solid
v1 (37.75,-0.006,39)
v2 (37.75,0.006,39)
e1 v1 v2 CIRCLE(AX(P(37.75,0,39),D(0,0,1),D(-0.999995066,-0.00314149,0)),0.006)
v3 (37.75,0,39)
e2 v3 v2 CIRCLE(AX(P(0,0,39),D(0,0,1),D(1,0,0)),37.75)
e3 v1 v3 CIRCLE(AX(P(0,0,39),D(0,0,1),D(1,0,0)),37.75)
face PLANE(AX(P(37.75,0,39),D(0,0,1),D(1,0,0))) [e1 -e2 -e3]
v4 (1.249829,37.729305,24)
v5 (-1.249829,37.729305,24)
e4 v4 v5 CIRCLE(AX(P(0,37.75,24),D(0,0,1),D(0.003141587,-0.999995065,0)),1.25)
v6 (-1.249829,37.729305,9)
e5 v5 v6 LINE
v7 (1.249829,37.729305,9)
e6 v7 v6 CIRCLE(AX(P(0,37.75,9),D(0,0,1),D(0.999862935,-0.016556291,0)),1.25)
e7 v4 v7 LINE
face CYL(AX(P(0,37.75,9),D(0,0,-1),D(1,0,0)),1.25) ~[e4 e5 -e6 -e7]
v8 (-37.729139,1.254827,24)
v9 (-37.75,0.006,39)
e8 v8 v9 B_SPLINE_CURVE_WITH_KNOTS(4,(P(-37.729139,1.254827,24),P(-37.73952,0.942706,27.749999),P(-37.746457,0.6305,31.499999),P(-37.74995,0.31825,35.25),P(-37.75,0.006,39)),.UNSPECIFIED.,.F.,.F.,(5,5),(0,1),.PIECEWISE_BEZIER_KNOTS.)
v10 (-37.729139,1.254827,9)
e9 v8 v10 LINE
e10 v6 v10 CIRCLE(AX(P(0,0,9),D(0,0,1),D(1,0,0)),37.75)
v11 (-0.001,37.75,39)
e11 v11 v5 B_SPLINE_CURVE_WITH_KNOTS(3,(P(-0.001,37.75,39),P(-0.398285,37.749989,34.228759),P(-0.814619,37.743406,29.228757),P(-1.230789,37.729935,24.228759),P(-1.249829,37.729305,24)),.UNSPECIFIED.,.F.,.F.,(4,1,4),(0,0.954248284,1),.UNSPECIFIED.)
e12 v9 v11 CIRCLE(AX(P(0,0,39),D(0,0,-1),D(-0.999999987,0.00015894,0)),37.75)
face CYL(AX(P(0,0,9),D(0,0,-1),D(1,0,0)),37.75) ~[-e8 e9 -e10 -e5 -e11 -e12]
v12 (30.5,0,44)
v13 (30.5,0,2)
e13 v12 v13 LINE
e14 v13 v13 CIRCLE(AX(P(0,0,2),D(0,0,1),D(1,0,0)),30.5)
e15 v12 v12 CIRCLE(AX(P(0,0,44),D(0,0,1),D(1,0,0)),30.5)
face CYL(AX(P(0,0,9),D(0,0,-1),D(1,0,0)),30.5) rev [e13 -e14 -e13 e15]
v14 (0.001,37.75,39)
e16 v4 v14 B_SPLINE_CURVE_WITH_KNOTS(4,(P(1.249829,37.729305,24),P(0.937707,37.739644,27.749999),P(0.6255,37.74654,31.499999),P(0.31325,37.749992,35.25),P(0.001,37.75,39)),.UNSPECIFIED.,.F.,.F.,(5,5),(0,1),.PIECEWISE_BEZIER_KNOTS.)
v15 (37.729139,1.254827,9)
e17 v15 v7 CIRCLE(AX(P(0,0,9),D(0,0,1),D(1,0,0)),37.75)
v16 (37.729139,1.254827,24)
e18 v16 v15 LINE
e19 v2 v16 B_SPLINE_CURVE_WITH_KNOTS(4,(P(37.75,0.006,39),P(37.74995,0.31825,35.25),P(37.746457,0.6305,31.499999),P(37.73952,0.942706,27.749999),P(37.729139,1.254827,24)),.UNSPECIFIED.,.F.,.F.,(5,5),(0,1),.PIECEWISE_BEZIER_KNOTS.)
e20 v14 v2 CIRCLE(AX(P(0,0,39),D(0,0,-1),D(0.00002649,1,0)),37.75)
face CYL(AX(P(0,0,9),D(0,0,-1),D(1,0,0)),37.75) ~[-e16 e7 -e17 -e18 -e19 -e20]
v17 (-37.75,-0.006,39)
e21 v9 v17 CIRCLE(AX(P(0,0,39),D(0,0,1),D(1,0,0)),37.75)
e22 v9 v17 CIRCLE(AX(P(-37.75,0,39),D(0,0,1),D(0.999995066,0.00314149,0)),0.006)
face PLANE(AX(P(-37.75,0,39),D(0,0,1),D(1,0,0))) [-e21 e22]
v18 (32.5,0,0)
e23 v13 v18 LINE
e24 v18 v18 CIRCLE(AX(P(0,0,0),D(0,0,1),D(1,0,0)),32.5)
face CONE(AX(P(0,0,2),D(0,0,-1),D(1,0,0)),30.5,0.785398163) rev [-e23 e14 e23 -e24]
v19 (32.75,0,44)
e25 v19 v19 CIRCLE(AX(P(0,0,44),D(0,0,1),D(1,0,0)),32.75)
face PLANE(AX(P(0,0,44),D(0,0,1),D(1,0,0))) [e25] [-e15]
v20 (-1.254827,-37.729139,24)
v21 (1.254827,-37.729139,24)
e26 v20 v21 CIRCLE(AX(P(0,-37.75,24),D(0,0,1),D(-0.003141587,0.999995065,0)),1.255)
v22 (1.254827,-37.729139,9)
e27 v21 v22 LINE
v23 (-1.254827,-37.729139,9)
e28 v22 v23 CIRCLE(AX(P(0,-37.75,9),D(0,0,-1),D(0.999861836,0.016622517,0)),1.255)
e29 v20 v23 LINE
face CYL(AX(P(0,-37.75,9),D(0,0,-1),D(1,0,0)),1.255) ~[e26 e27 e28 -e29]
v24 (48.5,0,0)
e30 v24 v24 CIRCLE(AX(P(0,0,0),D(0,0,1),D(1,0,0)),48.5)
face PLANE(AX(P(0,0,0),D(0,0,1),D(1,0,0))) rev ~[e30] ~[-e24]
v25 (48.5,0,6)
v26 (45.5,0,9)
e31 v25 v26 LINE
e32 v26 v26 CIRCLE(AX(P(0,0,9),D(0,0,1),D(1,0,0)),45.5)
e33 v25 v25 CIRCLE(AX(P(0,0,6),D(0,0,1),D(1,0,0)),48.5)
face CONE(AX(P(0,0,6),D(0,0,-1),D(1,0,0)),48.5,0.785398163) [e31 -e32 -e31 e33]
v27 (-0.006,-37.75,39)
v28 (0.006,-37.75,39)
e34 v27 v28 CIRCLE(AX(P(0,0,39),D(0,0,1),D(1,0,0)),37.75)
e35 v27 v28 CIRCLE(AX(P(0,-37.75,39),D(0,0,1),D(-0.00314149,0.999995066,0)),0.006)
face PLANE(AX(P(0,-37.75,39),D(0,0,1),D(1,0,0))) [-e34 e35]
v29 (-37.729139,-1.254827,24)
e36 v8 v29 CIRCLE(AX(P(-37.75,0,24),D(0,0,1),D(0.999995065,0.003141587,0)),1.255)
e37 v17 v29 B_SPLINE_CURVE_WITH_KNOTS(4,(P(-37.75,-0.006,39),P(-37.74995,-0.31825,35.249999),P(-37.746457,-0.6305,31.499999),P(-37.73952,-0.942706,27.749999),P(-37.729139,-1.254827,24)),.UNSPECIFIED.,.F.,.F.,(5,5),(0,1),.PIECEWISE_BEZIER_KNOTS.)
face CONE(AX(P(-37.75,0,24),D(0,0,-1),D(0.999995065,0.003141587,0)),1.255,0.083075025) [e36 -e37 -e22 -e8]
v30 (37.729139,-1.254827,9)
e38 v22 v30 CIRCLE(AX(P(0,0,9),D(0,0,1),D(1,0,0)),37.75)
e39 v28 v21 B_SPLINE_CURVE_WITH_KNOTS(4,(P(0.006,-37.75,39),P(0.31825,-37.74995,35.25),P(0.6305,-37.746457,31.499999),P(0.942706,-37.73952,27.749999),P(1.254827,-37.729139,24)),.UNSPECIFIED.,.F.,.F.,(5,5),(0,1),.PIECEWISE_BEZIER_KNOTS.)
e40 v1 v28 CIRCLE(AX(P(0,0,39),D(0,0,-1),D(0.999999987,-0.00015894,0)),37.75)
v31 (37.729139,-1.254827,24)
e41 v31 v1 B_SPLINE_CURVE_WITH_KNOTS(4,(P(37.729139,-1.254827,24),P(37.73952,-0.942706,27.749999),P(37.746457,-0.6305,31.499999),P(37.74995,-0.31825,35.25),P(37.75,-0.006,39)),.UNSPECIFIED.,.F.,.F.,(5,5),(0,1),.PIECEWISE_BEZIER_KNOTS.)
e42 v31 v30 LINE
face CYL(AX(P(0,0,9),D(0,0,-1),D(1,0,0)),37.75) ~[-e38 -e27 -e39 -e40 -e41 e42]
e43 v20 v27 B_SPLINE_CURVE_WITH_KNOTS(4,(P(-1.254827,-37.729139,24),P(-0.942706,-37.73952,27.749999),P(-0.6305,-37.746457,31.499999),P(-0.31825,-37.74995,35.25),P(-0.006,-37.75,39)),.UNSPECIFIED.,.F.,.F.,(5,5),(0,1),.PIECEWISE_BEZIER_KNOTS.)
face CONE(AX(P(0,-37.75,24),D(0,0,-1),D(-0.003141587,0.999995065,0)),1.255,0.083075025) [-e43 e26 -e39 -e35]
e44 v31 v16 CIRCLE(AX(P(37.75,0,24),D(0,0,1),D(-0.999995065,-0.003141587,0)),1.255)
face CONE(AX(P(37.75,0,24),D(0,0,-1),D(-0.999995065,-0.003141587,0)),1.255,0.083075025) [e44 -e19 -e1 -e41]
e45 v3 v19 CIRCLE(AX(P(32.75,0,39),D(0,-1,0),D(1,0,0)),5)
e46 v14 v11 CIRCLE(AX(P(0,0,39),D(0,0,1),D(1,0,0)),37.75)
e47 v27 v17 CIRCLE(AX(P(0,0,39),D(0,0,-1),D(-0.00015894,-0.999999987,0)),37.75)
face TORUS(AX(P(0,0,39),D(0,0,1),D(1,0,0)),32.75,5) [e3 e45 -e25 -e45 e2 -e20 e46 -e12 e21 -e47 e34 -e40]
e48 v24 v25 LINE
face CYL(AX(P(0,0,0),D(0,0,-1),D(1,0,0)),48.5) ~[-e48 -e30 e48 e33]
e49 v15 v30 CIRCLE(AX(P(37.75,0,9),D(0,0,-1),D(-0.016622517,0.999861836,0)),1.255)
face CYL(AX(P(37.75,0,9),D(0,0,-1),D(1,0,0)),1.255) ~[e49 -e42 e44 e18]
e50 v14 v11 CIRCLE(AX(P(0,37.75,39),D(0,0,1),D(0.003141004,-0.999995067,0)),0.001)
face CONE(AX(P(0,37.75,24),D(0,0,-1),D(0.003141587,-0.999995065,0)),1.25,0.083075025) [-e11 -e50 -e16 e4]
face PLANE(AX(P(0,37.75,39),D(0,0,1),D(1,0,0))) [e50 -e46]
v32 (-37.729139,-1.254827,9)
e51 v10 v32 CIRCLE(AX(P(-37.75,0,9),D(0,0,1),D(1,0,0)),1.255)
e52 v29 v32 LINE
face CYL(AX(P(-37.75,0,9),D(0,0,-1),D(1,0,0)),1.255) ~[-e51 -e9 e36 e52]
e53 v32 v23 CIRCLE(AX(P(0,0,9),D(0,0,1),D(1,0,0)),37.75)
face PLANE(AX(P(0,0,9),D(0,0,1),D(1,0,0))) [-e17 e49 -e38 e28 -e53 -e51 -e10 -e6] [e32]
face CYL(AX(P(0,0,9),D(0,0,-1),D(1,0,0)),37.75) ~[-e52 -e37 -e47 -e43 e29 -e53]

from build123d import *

# Parameters (mm, degrees)
F0_R         = 48.5
F0_R_2       = 30.5
F1_DEPTH     = 9
F2_R         = 37.75
F2_R_2       = 30.5
F3_DEPTH     = 35
F4_R         = 5
F5_R         = 1.25
F5_R_2       = 1.255
F6_DEPTH     = 30
F7_T4_ANGLE  = 359.64
F7_S5_R      = 37.75
F7_T6_DEPTH  = 9
F7_T10_ANGLE = 359.64
F7_S11_R     = 37.75
F7_T12_DEPTH = 9
F7_T16_ANGLE = 359.64
F7_S17_R     = 37.75
F7_T18_DEPTH = 9
F7_T22_ANGLE = 359.64
F7_S23_R     = 37.75
F7_T24_DEPTH = 9
F8_SIZE      = 2
F9_SIZE      = 3


# Not quite as in the source:
# - a fillet or chamfer that OpenCascade refuses, or shapes differently, is made with other operations: its cross-section is extruded or revolved along the edge and cut away or added


with BuildPart() as f1:
    # F0 (on Top) → F1 (new body)
    with BuildSketch(Plane.XY):
        Circle(F0_R)
        Circle(F0_R_2, mode=Mode.SUBTRACT)
    extrude(amount=F1_DEPTH)

    # F2 (on face) → F3 (join)
    with BuildSketch(Plane.XY.offset(9)):
        Circle(F2_R)
        Circle(F2_R_2, mode=Mode.SUBTRACT)
    extrude(amount=F3_DEPTH)

    # F4
    f4_edges = [f1.edges().sort_by_distance(p)[0] for p in [
        (-37.75, 0, 44),
    ]]
    fillet(f4_edges, radius=F4_R)

    # F5 (on face) → F6 (join)
    with BuildSketch(Plane.XY.offset(9)):
        with Locations((0, 37.75)):
            Circle(F5_R)
        with Locations((-37.75, 0)):
            Circle(F5_R_2)
        with Locations((0, -37.75)):
            Circle(F5_R_2)
        with Locations((37.75, 0)):
            Circle(F5_R_2)
    extrude(amount=F6_DEPTH)

    # F7: chamfer of 1.249 x 15 on 4 edges, made by hand


with BuildPart() as f7_tool2:
    # F7_s3 → F7_t4 (revolve)
    with BuildSketch(Plane(origin=(-0.0003725763, 0.1185943423, 0), x_dir=(0, 0, 1), z_dir=(0.0031415875, -0.9999950652, 0))):
        Polygon((24, 36.4948137114), (39, 37.7438137114), (39, 36.4948137114), align=None)
    revolve(axis=Axis((-37.75, 0, 39), (0, 0, 1)), revolution_arc=F7_T4_ANGLE)

    # F7_s5 → F7_t6 (cut, symmetric)
    with BuildSketch(Plane.XY.offset(31.5)):
        Circle(F7_S5_R)
    extrude(amount=F7_T6_DEPTH, both=True, mode=Mode.SUBTRACT)


with BuildPart() as f1_1:
    add(f1.part)

    # F7_t1: cut F7_tool2
    add(f7_tool2.part, mode=Mode.SUBTRACT)


with BuildPart() as f7_tool8:
    # F7_s9 → F7_t10 (revolve)
    with BuildSketch(Plane(origin=(0.1185943423, 0.0003725763, 0), x_dir=(0, 0, 1), z_dir=(-0.9999950652, -0.0031415875, 0))):
        Polygon((24, 36.4998137114), (39, 37.7488137114), (39, 36.4998137114), align=None)
    revolve(axis=Axis((0, 37.75, 39), (0, 0, 1)), revolution_arc=F7_T10_ANGLE)

    # F7_s11 → F7_t12 (cut, symmetric)
    with BuildSketch(Plane.XY.offset(31.5)):
        Circle(F7_S11_R)
    extrude(amount=F7_T12_DEPTH, both=True, mode=Mode.SUBTRACT)


with BuildPart() as f1_2:
    add(f1_1.part)

    # F7_t7: cut F7_tool8
    add(f7_tool8.part, mode=Mode.SUBTRACT)


with BuildPart() as f7_tool14:
    # F7_s15 → F7_t16 (revolve)
    with BuildSketch(Plane(origin=(-0.1185943423, -0.0003725763, 0), x_dir=(0, 0, 1), z_dir=(0.9999950652, 0.0031415875, 0))):
        Polygon((24, 36.4948137114), (39, 37.7438137114), (39, 36.4948137114), align=None)
    revolve(axis=Axis((0, -37.75, 39), (0, 0, 1)), revolution_arc=F7_T16_ANGLE)

    # F7_s17 → F7_t18 (cut, symmetric)
    with BuildSketch(Plane.XY.offset(31.5)):
        Circle(F7_S17_R)
    extrude(amount=F7_T18_DEPTH, both=True, mode=Mode.SUBTRACT)


with BuildPart() as f1_3:
    add(f1_2.part)

    # F7_t13: cut F7_tool14
    add(f7_tool14.part, mode=Mode.SUBTRACT)


with BuildPart() as f7_tool20:
    # F7_s21 → F7_t22 (revolve)
    with BuildSketch(Plane(origin=(0.0003725763, -0.1185943423, 0), x_dir=(0, 0, 1), z_dir=(-0.0031415875, 0.9999950652, 0))):
        Polygon((24, 36.4948137114), (39, 37.7438137114), (39, 36.4948137114), align=None)
    revolve(axis=Axis((37.75, 0, 39), (0, 0, 1)), revolution_arc=F7_T22_ANGLE)

    # F7_s23 → F7_t24 (cut, symmetric)
    with BuildSketch(Plane.XY.offset(31.5)):
        Circle(F7_S23_R)
    extrude(amount=F7_T24_DEPTH, both=True, mode=Mode.SUBTRACT)


with BuildPart() as f1_4:
    add(f1_3.part)

    # F7_t19: cut F7_tool20
    add(f7_tool20.part, mode=Mode.SUBTRACT)

    # F8
    f8_edges = [f1_4.edges().sort_by_distance(p)[0] for p in [
        (-30.5, 0, 0),
    ]]
    chamfer(f8_edges, length=F8_SIZE)

    # F9
    f9_edges = [f1_4.edges().sort_by_distance(p)[0] for p in [
        (-48.5, 0, 9),
    ]]
    chamfer(f9_edges, length=F9_SIZE)


solid = f1_4.part
